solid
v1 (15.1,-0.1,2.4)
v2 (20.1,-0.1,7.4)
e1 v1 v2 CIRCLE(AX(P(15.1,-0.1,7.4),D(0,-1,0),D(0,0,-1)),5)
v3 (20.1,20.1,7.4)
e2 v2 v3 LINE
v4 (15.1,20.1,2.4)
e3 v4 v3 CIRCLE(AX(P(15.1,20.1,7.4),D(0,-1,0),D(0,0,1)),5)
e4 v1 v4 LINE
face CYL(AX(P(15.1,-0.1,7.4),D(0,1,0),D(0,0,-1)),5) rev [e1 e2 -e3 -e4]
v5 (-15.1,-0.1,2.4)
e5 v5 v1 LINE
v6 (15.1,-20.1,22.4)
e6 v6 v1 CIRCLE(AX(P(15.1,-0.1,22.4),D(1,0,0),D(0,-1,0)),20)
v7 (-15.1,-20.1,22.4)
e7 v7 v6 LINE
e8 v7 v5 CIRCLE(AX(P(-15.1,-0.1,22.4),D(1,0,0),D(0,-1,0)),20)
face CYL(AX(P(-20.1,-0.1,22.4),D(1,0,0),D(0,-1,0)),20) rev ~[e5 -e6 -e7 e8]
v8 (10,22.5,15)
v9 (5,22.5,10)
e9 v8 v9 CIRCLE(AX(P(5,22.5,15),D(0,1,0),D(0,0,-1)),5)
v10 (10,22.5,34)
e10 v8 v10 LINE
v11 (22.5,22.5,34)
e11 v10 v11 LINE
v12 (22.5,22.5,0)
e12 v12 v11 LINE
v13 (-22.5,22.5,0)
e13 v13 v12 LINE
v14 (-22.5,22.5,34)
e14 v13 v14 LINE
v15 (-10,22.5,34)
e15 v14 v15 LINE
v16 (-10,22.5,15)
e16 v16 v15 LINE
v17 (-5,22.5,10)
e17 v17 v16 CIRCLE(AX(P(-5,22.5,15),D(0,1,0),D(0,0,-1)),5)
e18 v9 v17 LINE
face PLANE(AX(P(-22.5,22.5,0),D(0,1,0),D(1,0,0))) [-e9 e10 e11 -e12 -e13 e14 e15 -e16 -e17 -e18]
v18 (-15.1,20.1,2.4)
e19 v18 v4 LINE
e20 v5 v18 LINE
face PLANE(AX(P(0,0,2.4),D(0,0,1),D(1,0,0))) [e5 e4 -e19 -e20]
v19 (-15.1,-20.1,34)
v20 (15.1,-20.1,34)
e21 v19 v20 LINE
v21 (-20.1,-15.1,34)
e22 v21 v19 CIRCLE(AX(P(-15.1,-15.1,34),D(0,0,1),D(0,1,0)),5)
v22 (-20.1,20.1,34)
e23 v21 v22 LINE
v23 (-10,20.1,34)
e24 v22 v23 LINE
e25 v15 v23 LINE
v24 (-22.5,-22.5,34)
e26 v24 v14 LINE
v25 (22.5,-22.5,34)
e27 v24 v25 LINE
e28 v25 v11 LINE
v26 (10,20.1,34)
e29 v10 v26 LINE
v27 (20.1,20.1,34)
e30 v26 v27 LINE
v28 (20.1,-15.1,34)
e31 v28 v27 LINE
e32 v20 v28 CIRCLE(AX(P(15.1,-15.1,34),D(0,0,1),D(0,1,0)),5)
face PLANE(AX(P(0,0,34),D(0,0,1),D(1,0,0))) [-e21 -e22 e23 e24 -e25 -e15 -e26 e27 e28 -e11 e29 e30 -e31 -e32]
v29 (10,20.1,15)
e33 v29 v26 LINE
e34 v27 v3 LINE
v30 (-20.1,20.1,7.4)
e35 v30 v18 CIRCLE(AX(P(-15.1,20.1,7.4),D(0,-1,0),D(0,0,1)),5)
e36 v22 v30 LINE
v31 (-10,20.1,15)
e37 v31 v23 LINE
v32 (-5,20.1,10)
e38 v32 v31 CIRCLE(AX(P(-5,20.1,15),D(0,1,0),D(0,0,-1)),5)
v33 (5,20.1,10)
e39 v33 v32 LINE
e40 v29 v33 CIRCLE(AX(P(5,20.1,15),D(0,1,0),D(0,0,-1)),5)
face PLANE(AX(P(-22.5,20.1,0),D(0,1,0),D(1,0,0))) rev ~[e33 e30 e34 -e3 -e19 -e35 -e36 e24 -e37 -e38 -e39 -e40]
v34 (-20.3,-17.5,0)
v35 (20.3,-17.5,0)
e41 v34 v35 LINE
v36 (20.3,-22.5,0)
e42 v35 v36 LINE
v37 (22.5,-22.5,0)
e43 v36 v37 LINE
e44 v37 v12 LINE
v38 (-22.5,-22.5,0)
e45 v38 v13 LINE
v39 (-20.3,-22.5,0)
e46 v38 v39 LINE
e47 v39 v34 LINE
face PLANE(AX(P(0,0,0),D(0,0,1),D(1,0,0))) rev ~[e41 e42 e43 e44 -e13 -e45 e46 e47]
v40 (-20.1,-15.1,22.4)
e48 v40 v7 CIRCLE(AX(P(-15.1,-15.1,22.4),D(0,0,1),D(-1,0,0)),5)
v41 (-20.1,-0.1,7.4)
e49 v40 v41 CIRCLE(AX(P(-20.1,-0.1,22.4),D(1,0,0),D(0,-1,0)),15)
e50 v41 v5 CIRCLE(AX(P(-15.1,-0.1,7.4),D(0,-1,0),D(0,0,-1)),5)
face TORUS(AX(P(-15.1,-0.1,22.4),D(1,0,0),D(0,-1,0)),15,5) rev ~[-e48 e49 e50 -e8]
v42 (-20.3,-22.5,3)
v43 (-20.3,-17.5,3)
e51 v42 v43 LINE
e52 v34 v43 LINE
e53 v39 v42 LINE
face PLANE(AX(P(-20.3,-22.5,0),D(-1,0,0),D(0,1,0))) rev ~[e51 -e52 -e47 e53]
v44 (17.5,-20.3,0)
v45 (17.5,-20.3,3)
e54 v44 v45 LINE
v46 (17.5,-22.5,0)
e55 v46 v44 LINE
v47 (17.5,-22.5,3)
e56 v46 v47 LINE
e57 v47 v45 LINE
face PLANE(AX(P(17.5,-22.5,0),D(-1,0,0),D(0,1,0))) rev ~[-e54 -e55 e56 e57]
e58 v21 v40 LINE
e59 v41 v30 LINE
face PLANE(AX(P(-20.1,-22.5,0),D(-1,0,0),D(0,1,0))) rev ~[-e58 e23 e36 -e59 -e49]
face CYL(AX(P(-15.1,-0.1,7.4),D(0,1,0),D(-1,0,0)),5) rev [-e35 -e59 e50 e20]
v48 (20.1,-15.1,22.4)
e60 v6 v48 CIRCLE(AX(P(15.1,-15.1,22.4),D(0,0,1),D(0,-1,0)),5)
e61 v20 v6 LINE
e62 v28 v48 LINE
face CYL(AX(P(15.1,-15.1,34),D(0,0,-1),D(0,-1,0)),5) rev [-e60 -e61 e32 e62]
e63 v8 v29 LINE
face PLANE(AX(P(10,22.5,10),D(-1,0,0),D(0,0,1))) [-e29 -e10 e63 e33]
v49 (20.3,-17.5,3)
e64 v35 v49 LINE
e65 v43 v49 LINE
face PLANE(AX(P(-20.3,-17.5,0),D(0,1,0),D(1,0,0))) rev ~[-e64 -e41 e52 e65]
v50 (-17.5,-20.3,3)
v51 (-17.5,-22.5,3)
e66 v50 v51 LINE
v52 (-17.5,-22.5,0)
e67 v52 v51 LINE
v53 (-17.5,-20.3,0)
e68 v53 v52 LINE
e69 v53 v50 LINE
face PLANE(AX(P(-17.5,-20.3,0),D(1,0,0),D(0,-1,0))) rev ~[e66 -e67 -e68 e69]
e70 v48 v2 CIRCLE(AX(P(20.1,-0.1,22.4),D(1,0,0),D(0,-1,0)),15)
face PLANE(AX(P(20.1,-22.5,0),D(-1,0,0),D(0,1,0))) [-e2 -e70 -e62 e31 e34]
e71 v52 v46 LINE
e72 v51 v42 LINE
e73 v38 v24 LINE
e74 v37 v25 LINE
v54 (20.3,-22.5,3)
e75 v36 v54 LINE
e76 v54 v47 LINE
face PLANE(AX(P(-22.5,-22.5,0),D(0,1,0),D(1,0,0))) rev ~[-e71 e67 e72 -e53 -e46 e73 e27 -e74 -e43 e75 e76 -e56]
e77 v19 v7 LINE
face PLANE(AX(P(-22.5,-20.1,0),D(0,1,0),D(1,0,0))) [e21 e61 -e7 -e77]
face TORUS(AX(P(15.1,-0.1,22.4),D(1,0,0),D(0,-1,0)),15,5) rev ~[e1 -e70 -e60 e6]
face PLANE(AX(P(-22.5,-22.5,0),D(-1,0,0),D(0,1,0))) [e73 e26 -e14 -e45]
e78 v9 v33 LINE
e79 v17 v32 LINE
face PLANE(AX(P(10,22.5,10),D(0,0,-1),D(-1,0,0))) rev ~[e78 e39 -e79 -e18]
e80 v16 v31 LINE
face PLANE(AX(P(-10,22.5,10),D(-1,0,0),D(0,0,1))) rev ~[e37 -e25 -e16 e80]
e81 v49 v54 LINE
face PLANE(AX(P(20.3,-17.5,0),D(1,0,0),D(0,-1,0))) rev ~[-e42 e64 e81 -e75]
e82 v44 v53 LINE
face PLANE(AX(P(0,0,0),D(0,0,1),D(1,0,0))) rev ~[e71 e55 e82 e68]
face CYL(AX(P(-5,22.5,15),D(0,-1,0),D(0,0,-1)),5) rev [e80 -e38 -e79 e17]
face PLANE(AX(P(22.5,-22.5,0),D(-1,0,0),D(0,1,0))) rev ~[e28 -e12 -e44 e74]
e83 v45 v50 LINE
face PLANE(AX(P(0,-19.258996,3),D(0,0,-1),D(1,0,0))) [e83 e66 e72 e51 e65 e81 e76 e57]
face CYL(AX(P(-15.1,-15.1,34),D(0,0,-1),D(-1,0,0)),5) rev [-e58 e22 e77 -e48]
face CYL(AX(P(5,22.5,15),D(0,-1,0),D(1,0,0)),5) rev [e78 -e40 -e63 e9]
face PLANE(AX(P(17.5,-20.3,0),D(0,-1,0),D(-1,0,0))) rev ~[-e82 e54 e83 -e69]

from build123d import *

# Parameters (mm, degrees)
F0_W     = 45
F0_H     = 45
F1_DEPTH = 34
F2_T     = -2.4
F3_R     = 20
F4_R     = 5
F5_W     = 20
F5_H     = 24
F6_DEPTH = 5
F7_R     = 5
F9_DEPTH = 3


with BuildPart() as f1:
    # F0 (on Top) → F1 (new body)
    with BuildSketch(Plane.XY):
        Rectangle(F0_W, F0_H)
    extrude(amount=F1_DEPTH)

    # F2
    f2_openings = [f1.faces().sort_by_distance(p)[0] for p in [
        (0, 0, 34),
    ]]
    offset(amount=F2_T, openings=f2_openings)

    # F3
    f3_edges = [f1.edges().sort_by_distance(p)[0] for p in [
        (0, -20.1, 2.4),
    ]]
    fillet(f3_edges, radius=F3_R)

    # F4
    f4_edges = [f1.edges().sort_by_distance(p)[0] for p in [
        (-20.1, 10, 2.4),
        (20.1, 10, 2.4),
    ]]
    fillet(f4_edges, radius=F4_R)

    # F5 (on face) → F6 (cut)
    with BuildSketch(Plane(origin=(0, 22.5, 0), x_dir=(-1, 0, 0), z_dir=(0, 1, 0))):
        with Locations((0, 22)):
            Rectangle(F5_W, F5_H)
    extrude(amount=-F6_DEPTH, mode=Mode.SUBTRACT)

    # F7
    f7_edges = [f1.edges().sort_by_distance(p)[0] for p in [
        (10, 21.3, 10),
        (-10, 21.3, 10),
    ]]
    fillet(f7_edges, radius=F7_R)

    # F8 (on face) → F9 (cut)
    with BuildSketch(Plane(origin=(0, 0, 0), x_dir=(1, 0, 0), z_dir=(0, 0, -1))):
        Polygon((-17.5, 22.5), (-20.3, 22.5), (-20.3, 20), (-20.3, 17.5), (20.3, 17.5), (20.3, 20), (20.3, 22.5), (17.5, 22.5), (17.5, 20.3), (-17.5, 20.3), align=None)
    extrude(amount=-F9_DEPTH, mode=Mode.SUBTRACT)


solid = f1.part
